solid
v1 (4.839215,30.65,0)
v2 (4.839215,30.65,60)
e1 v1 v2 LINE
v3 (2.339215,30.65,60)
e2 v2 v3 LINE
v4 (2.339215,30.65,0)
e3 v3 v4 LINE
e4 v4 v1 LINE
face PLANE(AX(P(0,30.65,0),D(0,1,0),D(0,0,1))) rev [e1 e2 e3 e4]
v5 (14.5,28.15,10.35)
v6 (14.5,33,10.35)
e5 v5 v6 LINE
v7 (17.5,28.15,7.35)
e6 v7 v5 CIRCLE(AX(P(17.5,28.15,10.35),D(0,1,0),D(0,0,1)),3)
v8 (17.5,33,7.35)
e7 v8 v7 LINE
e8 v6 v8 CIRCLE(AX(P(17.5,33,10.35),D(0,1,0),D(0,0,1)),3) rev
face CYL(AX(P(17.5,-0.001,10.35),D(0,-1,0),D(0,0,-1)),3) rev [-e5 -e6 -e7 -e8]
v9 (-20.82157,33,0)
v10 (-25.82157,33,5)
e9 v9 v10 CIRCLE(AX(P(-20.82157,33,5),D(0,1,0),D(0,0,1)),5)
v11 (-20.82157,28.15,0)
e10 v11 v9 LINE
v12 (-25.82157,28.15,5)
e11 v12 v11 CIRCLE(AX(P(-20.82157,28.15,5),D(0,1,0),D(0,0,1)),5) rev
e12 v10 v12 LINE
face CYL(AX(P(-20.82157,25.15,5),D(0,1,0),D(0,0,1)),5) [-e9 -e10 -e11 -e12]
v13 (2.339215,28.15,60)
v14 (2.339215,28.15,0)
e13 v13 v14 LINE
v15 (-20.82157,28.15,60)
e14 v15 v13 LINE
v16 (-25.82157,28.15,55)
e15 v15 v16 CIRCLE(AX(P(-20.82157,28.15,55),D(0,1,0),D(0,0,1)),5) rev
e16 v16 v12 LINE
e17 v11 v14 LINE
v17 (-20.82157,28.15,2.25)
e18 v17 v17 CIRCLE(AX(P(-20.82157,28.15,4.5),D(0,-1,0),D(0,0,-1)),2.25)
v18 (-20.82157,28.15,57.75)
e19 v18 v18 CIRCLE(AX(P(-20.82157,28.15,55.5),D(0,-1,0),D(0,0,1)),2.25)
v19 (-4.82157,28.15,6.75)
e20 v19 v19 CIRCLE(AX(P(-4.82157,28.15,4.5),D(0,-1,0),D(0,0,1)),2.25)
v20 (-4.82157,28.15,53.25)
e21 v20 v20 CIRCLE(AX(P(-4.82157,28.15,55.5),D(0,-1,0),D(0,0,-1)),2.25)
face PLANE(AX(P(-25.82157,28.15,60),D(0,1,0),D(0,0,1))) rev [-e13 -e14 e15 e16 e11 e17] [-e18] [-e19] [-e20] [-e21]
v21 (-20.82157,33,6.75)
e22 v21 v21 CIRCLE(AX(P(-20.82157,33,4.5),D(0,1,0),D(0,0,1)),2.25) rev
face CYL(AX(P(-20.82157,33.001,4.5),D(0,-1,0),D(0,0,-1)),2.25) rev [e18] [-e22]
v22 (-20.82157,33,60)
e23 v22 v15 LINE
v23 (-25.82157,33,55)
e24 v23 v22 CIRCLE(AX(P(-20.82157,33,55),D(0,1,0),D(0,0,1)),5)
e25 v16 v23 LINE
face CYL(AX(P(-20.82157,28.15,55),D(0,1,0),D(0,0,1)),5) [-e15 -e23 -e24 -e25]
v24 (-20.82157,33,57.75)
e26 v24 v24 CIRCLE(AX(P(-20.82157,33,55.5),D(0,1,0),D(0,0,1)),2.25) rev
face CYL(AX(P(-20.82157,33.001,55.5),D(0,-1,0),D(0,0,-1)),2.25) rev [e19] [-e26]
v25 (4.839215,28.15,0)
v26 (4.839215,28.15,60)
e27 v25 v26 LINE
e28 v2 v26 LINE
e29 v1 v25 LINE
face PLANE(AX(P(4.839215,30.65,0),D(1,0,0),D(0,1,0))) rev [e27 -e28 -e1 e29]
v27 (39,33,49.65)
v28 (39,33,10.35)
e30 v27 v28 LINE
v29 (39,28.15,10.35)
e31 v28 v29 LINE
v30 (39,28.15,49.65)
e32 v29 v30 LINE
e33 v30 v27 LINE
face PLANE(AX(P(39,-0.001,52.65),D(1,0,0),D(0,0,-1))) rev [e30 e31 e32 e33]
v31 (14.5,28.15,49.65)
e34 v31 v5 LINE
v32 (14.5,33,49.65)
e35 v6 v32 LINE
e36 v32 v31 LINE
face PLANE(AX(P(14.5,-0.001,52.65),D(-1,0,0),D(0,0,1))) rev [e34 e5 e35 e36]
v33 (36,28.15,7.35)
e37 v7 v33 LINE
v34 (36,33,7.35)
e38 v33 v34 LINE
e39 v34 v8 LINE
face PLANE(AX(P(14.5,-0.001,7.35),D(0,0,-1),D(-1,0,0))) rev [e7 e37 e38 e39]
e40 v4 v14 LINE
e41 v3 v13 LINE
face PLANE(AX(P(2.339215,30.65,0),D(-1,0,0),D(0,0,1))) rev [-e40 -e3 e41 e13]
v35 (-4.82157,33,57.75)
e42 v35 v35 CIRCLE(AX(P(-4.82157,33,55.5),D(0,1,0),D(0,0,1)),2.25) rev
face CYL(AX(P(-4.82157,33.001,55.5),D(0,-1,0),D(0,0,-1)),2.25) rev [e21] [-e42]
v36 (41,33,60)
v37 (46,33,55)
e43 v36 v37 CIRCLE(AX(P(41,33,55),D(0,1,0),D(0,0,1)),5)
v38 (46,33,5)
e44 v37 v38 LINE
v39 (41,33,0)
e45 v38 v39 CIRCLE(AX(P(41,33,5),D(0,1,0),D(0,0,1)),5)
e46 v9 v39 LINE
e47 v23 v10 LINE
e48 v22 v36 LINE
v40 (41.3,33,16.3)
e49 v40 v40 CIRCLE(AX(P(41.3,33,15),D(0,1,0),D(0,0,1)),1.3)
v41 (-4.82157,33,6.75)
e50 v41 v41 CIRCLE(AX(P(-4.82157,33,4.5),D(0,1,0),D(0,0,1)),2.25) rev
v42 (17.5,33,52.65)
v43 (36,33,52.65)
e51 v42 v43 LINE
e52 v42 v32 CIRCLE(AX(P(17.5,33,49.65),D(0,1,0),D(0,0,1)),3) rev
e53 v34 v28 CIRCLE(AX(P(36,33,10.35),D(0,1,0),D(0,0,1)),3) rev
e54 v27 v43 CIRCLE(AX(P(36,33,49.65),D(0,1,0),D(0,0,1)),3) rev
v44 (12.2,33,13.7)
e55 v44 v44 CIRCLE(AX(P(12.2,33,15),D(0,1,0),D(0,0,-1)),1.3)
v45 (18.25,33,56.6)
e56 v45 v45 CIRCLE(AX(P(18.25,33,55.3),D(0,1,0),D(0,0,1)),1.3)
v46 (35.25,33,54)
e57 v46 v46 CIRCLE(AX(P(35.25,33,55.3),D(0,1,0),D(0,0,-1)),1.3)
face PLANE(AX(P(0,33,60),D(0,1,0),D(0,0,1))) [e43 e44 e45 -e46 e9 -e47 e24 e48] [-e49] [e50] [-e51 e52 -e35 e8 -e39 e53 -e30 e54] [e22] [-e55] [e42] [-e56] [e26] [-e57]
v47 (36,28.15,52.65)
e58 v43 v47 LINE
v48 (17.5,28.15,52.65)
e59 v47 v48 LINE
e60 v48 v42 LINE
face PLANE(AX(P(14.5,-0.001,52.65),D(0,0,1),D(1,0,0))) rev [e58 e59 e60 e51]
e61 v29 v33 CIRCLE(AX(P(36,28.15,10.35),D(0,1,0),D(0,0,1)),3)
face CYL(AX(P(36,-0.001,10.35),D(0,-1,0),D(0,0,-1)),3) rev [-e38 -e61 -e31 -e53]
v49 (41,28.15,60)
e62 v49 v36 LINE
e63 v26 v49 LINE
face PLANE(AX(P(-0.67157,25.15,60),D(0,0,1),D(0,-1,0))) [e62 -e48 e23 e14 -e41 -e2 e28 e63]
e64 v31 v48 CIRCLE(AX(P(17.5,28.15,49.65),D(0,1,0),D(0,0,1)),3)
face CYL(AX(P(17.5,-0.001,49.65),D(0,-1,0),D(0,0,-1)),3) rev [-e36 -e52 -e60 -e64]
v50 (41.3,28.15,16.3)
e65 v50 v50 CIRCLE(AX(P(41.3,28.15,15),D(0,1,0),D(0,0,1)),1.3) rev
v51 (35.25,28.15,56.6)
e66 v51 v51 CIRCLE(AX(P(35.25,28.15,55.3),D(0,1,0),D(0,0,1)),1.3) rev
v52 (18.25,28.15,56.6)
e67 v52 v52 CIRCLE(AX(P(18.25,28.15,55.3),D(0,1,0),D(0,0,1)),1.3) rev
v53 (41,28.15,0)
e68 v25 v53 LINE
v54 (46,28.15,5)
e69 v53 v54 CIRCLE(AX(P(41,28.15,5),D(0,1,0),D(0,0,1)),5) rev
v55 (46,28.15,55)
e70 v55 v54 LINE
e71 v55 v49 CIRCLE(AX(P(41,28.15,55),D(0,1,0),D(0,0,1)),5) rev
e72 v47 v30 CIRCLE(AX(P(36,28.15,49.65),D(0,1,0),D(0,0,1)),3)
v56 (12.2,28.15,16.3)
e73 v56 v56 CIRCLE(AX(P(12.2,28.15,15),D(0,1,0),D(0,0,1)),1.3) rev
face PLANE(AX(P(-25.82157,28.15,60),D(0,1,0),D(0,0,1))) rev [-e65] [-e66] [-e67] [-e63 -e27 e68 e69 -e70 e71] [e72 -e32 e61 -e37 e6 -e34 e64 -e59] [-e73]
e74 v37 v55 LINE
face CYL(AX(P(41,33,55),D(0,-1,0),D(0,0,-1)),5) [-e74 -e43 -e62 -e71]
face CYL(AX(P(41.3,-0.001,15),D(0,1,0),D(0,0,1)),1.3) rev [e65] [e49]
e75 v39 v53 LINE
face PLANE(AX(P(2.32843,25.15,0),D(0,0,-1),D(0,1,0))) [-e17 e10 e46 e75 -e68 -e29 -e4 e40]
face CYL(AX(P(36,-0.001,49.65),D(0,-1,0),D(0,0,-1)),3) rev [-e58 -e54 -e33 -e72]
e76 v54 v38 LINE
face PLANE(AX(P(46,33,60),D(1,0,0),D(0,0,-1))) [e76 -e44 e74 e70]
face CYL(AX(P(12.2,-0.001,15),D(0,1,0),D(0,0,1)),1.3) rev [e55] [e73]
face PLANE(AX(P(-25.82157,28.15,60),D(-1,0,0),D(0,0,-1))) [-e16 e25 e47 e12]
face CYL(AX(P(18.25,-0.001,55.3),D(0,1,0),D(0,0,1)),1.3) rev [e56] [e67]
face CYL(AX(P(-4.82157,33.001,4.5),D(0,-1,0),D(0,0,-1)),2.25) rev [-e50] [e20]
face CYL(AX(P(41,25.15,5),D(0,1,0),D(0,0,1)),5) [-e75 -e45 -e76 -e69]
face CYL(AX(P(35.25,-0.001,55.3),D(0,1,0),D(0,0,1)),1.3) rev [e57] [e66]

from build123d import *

# Parameters (mm, degrees)
T_LE_DE_BASE_PLI_E1_DEPTH     = 60
ENL_V_MAT_EXTRU_1_REACH       = 84.492
ESQUISSE7_W                   = 24.5
ESQUISSE7_H                   = 45.3
ENL_V_MAT_EXTRU_2_REACH       = 84.492
ESQUISSE8_R                   = 1.3
ENL_V_MAT_EXTRU_3_REACH       = 81.889
ESQUISSE9_R                   = 2.25
CONG_1_R                      = 3
CONG_2_R                      = 5
ENL_V_MAT_EXTRU_4_OUTLINE_W   = 9
ENL_V_MAT_EXTRU_4_OUTLINE_H   = 60
ENL_V_MAT_EXTRU_4_DEPTH       = 28.15
ENL_V_START                   = -2.5
ENL_V_MAT_EXTRU_4_2_OUTLINE_W = 2.5
ENL_V_MAT_EXTRU_4_2_OUTLINE_H = 60
ENL_V_MAT_EXTRU_4_2_DEPTH     = 2.5
ENL_V_START_2                 = -4.85
ENL_V_MAT_EXTRU_4_3_OUTLINE_R = 2.25
ENL_V_MAT_EXTRU_4_3_OUTLINE_W = 4.160785036
ENL_V_MAT_EXTRU_4_3_OUTLINE_H = 60
ENL_V_MAT_EXTRU_4_3_DEPTH     = 4.85
ENL_V_MAT_EXTRU_4_4_OUTLINE_W = 2.5
ENL_V_MAT_EXTRU_4_4_OUTLINE_H = 60
ENL_V_MAT_EXTRU_4_4_DEPTH     = 2.35


# Read off the part's stored shape, not the designer's step: Tôle de base pliée1, Enlèv. mat.-Extru.4
with BuildPart() as part:
    # Tôle de base pliée1 outline → Tôle de base pliée1 (new body)
    with BuildSketch(Plane.XY):
        with BuildLine():
            Line((7.85, 28.15), (46, 28.15))
            Line((46, 28.15), (46, 33))
            Line((46, 33), (7.85, 33))
            ThreePointArc((7.85, 33), (2.299211768, 30.700788232), (0, 25.15))
            Line((0, 25.15), (0, 0))
            Line((0, 0), (4.85, 0))
            Line((4.85, 0), (4.85, 25.15))
            ThreePointArc((4.85, 25.15), (5.728679656, 27.271320344), (7.85, 28.15))
        make_face()
    extrude(amount=T_LE_DE_BASE_PLI_E1_DEPTH)

    # Esquisse7 → Enlèv. mat.-Extru.1 (cut, up to next)
    with BuildSketch(Plane(origin=(0, 33, 0), x_dir=(1, 0, 0), z_dir=(0, 1, 0)), mode=Mode.PRIVATE) as enl_v_mat_extru_1_sk1:
        with Locations((26.75, -30)):
            Rectangle(ESQUISSE7_W, ESQUISSE7_H)
    enl_v_mat_extru_1_tool1 = extrude(enl_v_mat_extru_1_sk1.sketch, amount=-ENL_V_MAT_EXTRU_1_REACH, mode=Mode.PRIVATE) & part.part
    add(enl_v_mat_extru_1_tool1.solids().sort_by_distance((26.75, 33, 30))[0], mode=Mode.SUBTRACT)

    # Esquisse8 → Enlèv. mat.-Extru.2 (cut, up to next)
    with BuildSketch(Plane(origin=(0, 33, 0), x_dir=(1, 0, 0), z_dir=(0, 1, 0)), mode=Mode.PRIVATE) as enl_v_mat_extru_2_sk1:
        with Locations(Location((18.25, -55.3, 0), (0, 0, 270))):
            Circle(ESQUISSE8_R)
    enl_v_mat_extru_2_tool1 = extrude(enl_v_mat_extru_2_sk1.sketch, amount=-ENL_V_MAT_EXTRU_2_REACH, mode=Mode.PRIVATE) & part.part
    # Esquisse8 → Enlèv. mat.-Extru.2 (cut, up to next)
    with BuildSketch(Plane(origin=(0, 33, 0), x_dir=(1, 0, 0), z_dir=(0, 1, 0)), mode=Mode.PRIVATE) as enl_v_mat_extru_2_sk2:
        with Locations(Location((35.25, -55.3, 0), (0, 0, 270))):
            Circle(ESQUISSE8_R)
    enl_v_mat_extru_2_tool2 = extrude(enl_v_mat_extru_2_sk2.sketch, amount=-ENL_V_MAT_EXTRU_2_REACH, mode=Mode.PRIVATE) & part.part
    # Esquisse8 → Enlèv. mat.-Extru.2 (cut, up to next)
    with BuildSketch(Plane(origin=(0, 33, 0), x_dir=(1, 0, 0), z_dir=(0, 1, 0)), mode=Mode.PRIVATE) as enl_v_mat_extru_2_sk3:
        with Locations(Location((41.3, -15, 0), (0, 0, 270))):
            Circle(ESQUISSE8_R)
    enl_v_mat_extru_2_tool3 = extrude(enl_v_mat_extru_2_sk3.sketch, amount=-ENL_V_MAT_EXTRU_2_REACH, mode=Mode.PRIVATE) & part.part
    # Esquisse8 → Enlèv. mat.-Extru.2 (cut, up to next)
    with BuildSketch(Plane(origin=(0, 33, 0), x_dir=(1, 0, 0), z_dir=(0, 1, 0)), mode=Mode.PRIVATE) as enl_v_mat_extru_2_sk4:
        with Locations(Location((12.2, -15, 0), (0, 0, 270))):
            Circle(ESQUISSE8_R)
    enl_v_mat_extru_2_tool4 = extrude(enl_v_mat_extru_2_sk4.sketch, amount=-ENL_V_MAT_EXTRU_2_REACH, mode=Mode.PRIVATE) & part.part
    add(enl_v_mat_extru_2_tool1.solids().sort_by_distance((18.25, 33, 55.3))[0], mode=Mode.SUBTRACT)
    add(enl_v_mat_extru_2_tool2.solids().sort_by_distance((35.25, 33, 55.3))[0], mode=Mode.SUBTRACT)
    add(enl_v_mat_extru_2_tool3.solids().sort_by_distance((41.3, 33, 15))[0], mode=Mode.SUBTRACT)
    add(enl_v_mat_extru_2_tool4.solids().sort_by_distance((12.2, 33, 15))[0], mode=Mode.SUBTRACT)

    # Esquisse9 → Enlèv. mat.-Extru.3 (cut, up to next)
    with BuildSketch(Plane(origin=(4.85, 0, 0), x_dir=(0, 0, -1), z_dir=(1, 0, 0)), mode=Mode.PRIVATE) as enl_v_mat_extru_3_sk1:
        with Locations((-4.5, 5)):
            Circle(ESQUISSE9_R)
    enl_v_mat_extru_3_tool1 = extrude(enl_v_mat_extru_3_sk1.sketch, amount=-ENL_V_MAT_EXTRU_3_REACH, mode=Mode.PRIVATE) & part.part
    # Esquisse9 → Enlèv. mat.-Extru.3 (cut, up to next)
    with BuildSketch(Plane(origin=(4.85, 0, 0), x_dir=(0, 0, -1), z_dir=(1, 0, 0)), mode=Mode.PRIVATE) as enl_v_mat_extru_3_sk2:
        with Locations(Location((-4.5, 21, 0), (0, 0, 180))):
            Circle(ESQUISSE9_R)
    enl_v_mat_extru_3_tool2 = extrude(enl_v_mat_extru_3_sk2.sketch, amount=-ENL_V_MAT_EXTRU_3_REACH, mode=Mode.PRIVATE) & part.part
    # Esquisse9 → Enlèv. mat.-Extru.3 (cut, up to next)
    with BuildSketch(Plane(origin=(4.85, 0, 0), x_dir=(0, 0, -1), z_dir=(1, 0, 0)), mode=Mode.PRIVATE) as enl_v_mat_extru_3_sk3:
        with Locations((-55.5, 21)):
            Circle(ESQUISSE9_R)
    enl_v_mat_extru_3_tool3 = extrude(enl_v_mat_extru_3_sk3.sketch, amount=-ENL_V_MAT_EXTRU_3_REACH, mode=Mode.PRIVATE) & part.part
    # Esquisse9 → Enlèv. mat.-Extru.3 (cut, up to next)
    with BuildSketch(Plane(origin=(4.85, 0, 0), x_dir=(0, 0, -1), z_dir=(1, 0, 0)), mode=Mode.PRIVATE) as enl_v_mat_extru_3_sk4:
        with Locations(Location((-55.5, 5, 0), (0, 0, 180))):
            Circle(ESQUISSE9_R)
    enl_v_mat_extru_3_tool4 = extrude(enl_v_mat_extru_3_sk4.sketch, amount=-ENL_V_MAT_EXTRU_3_REACH, mode=Mode.PRIVATE) & part.part
    add(enl_v_mat_extru_3_tool1.solids().sort_by_distance((4.85, 5, 4.5))[0], mode=Mode.SUBTRACT)
    add(enl_v_mat_extru_3_tool2.solids().sort_by_distance((4.85, 21, 4.5))[0], mode=Mode.SUBTRACT)
    add(enl_v_mat_extru_3_tool3.solids().sort_by_distance((4.85, 21, 55.5))[0], mode=Mode.SUBTRACT)
    add(enl_v_mat_extru_3_tool4.solids().sort_by_distance((4.85, 5, 55.5))[0], mode=Mode.SUBTRACT)

    # Congé1
    cong_1_edges = [part.edges().sort_by_distance(p)[0] for p in [
        (14.5, 30.575, 52.65),
        (14.5, 30.575, 7.35),
        (39, 30.575, 7.35),
        (39, 30.575, 52.65),
    ]]
    fillet(cong_1_edges, radius=CONG_1_R)

    # Congé2
    cong_2_edges = [part.edges().sort_by_distance(p)[0] for p in [
        (2.425, 0, 60),
        (46, 30.575, 60),
        (2.425, 0, 0),
        (46, 30.575, 0),
    ]]
    fillet(cong_2_edges, radius=CONG_2_R)

    # Enlèv. mat.-Extru.4 outline → Enlèv. mat.-Extru.4 (cut)
    with BuildSketch(Plane.XZ.offset(-28.15)):
        with Locations((4.5, 30)):
            Rectangle(ENL_V_MAT_EXTRU_4_OUTLINE_W, ENL_V_MAT_EXTRU_4_OUTLINE_H)
    extrude(amount=ENL_V_MAT_EXTRU_4_DEPTH, mode=Mode.SUBTRACT)

    # Enl_v. mat.-Extru.4 2 outline → Enl_v. mat.-Extru.4 2 (cut)
    with BuildSketch(Plane.XZ.offset(-28.15).offset(ENL_V_START)):
        with Locations((3.589214964, 30)):
            Rectangle(ENL_V_MAT_EXTRU_4_2_OUTLINE_W, ENL_V_MAT_EXTRU_4_2_OUTLINE_H)
    extrude(amount=ENL_V_MAT_EXTRU_4_2_DEPTH, mode=Mode.SUBTRACT)

    # Enl_v. mat.-Extru.4 3 outline → Enl_v. mat.-Extru.4 3 (add)
    # profile 1 of 2: a face of its own
    with BuildSketch(Plane.XZ.offset(-28.15).offset(ENL_V_START_2)):
        with BuildLine():
            ThreePointArc((-25.821570073, 5), (-24.357103979, 1.464466094), (-20.821570073, 0))
            Line((-20.821570073, 0), (2.339214964, 0))
            Line((2.339214964, 0), (2.339214964, 60))
            Line((2.339214964, 60), (-20.821570073, 60))
            ThreePointArc((-20.821570073, 60), (-24.357103979, 58.535533906), (-25.821570073, 55))
            Line((-25.821570073, 55), (-25.821570073, 5))
        make_face()
        with Locations((-20.821570073, 4.5)):
            Circle(ENL_V_MAT_EXTRU_4_3_OUTLINE_R, mode=Mode.SUBTRACT)
        with Locations((-4.821570073, 4.5)):
            Circle(ENL_V_MAT_EXTRU_4_3_OUTLINE_R, mode=Mode.SUBTRACT)
        with Locations((-20.821570073, 55.5)):
            Circle(ENL_V_MAT_EXTRU_4_3_OUTLINE_R, mode=Mode.SUBTRACT)
        with Locations((-4.821570073, 55.5)):
            Circle(ENL_V_MAT_EXTRU_4_3_OUTLINE_R, mode=Mode.SUBTRACT)
    # profile 2 of 2: a face of its own
    with BuildSketch(Plane.XZ.offset(-28.15).offset(ENL_V_START_2)):
        with Locations((6.919607482, 30)):
            Rectangle(ENL_V_MAT_EXTRU_4_3_OUTLINE_W, ENL_V_MAT_EXTRU_4_3_OUTLINE_H)
    extrude(amount=ENL_V_MAT_EXTRU_4_3_DEPTH)

    # Enl_v. mat.-Extru.4 4 outline → Enl_v. mat.-Extru.4 4 (add)
    with BuildSketch(Plane.XZ.offset(-28.15).offset(ENL_V_START_2)):
        with Locations((3.589214964, 30)):
            Rectangle(ENL_V_MAT_EXTRU_4_4_OUTLINE_W, ENL_V_MAT_EXTRU_4_4_OUTLINE_H)
    extrude(amount=ENL_V_MAT_EXTRU_4_4_DEPTH)


solid = part.part
